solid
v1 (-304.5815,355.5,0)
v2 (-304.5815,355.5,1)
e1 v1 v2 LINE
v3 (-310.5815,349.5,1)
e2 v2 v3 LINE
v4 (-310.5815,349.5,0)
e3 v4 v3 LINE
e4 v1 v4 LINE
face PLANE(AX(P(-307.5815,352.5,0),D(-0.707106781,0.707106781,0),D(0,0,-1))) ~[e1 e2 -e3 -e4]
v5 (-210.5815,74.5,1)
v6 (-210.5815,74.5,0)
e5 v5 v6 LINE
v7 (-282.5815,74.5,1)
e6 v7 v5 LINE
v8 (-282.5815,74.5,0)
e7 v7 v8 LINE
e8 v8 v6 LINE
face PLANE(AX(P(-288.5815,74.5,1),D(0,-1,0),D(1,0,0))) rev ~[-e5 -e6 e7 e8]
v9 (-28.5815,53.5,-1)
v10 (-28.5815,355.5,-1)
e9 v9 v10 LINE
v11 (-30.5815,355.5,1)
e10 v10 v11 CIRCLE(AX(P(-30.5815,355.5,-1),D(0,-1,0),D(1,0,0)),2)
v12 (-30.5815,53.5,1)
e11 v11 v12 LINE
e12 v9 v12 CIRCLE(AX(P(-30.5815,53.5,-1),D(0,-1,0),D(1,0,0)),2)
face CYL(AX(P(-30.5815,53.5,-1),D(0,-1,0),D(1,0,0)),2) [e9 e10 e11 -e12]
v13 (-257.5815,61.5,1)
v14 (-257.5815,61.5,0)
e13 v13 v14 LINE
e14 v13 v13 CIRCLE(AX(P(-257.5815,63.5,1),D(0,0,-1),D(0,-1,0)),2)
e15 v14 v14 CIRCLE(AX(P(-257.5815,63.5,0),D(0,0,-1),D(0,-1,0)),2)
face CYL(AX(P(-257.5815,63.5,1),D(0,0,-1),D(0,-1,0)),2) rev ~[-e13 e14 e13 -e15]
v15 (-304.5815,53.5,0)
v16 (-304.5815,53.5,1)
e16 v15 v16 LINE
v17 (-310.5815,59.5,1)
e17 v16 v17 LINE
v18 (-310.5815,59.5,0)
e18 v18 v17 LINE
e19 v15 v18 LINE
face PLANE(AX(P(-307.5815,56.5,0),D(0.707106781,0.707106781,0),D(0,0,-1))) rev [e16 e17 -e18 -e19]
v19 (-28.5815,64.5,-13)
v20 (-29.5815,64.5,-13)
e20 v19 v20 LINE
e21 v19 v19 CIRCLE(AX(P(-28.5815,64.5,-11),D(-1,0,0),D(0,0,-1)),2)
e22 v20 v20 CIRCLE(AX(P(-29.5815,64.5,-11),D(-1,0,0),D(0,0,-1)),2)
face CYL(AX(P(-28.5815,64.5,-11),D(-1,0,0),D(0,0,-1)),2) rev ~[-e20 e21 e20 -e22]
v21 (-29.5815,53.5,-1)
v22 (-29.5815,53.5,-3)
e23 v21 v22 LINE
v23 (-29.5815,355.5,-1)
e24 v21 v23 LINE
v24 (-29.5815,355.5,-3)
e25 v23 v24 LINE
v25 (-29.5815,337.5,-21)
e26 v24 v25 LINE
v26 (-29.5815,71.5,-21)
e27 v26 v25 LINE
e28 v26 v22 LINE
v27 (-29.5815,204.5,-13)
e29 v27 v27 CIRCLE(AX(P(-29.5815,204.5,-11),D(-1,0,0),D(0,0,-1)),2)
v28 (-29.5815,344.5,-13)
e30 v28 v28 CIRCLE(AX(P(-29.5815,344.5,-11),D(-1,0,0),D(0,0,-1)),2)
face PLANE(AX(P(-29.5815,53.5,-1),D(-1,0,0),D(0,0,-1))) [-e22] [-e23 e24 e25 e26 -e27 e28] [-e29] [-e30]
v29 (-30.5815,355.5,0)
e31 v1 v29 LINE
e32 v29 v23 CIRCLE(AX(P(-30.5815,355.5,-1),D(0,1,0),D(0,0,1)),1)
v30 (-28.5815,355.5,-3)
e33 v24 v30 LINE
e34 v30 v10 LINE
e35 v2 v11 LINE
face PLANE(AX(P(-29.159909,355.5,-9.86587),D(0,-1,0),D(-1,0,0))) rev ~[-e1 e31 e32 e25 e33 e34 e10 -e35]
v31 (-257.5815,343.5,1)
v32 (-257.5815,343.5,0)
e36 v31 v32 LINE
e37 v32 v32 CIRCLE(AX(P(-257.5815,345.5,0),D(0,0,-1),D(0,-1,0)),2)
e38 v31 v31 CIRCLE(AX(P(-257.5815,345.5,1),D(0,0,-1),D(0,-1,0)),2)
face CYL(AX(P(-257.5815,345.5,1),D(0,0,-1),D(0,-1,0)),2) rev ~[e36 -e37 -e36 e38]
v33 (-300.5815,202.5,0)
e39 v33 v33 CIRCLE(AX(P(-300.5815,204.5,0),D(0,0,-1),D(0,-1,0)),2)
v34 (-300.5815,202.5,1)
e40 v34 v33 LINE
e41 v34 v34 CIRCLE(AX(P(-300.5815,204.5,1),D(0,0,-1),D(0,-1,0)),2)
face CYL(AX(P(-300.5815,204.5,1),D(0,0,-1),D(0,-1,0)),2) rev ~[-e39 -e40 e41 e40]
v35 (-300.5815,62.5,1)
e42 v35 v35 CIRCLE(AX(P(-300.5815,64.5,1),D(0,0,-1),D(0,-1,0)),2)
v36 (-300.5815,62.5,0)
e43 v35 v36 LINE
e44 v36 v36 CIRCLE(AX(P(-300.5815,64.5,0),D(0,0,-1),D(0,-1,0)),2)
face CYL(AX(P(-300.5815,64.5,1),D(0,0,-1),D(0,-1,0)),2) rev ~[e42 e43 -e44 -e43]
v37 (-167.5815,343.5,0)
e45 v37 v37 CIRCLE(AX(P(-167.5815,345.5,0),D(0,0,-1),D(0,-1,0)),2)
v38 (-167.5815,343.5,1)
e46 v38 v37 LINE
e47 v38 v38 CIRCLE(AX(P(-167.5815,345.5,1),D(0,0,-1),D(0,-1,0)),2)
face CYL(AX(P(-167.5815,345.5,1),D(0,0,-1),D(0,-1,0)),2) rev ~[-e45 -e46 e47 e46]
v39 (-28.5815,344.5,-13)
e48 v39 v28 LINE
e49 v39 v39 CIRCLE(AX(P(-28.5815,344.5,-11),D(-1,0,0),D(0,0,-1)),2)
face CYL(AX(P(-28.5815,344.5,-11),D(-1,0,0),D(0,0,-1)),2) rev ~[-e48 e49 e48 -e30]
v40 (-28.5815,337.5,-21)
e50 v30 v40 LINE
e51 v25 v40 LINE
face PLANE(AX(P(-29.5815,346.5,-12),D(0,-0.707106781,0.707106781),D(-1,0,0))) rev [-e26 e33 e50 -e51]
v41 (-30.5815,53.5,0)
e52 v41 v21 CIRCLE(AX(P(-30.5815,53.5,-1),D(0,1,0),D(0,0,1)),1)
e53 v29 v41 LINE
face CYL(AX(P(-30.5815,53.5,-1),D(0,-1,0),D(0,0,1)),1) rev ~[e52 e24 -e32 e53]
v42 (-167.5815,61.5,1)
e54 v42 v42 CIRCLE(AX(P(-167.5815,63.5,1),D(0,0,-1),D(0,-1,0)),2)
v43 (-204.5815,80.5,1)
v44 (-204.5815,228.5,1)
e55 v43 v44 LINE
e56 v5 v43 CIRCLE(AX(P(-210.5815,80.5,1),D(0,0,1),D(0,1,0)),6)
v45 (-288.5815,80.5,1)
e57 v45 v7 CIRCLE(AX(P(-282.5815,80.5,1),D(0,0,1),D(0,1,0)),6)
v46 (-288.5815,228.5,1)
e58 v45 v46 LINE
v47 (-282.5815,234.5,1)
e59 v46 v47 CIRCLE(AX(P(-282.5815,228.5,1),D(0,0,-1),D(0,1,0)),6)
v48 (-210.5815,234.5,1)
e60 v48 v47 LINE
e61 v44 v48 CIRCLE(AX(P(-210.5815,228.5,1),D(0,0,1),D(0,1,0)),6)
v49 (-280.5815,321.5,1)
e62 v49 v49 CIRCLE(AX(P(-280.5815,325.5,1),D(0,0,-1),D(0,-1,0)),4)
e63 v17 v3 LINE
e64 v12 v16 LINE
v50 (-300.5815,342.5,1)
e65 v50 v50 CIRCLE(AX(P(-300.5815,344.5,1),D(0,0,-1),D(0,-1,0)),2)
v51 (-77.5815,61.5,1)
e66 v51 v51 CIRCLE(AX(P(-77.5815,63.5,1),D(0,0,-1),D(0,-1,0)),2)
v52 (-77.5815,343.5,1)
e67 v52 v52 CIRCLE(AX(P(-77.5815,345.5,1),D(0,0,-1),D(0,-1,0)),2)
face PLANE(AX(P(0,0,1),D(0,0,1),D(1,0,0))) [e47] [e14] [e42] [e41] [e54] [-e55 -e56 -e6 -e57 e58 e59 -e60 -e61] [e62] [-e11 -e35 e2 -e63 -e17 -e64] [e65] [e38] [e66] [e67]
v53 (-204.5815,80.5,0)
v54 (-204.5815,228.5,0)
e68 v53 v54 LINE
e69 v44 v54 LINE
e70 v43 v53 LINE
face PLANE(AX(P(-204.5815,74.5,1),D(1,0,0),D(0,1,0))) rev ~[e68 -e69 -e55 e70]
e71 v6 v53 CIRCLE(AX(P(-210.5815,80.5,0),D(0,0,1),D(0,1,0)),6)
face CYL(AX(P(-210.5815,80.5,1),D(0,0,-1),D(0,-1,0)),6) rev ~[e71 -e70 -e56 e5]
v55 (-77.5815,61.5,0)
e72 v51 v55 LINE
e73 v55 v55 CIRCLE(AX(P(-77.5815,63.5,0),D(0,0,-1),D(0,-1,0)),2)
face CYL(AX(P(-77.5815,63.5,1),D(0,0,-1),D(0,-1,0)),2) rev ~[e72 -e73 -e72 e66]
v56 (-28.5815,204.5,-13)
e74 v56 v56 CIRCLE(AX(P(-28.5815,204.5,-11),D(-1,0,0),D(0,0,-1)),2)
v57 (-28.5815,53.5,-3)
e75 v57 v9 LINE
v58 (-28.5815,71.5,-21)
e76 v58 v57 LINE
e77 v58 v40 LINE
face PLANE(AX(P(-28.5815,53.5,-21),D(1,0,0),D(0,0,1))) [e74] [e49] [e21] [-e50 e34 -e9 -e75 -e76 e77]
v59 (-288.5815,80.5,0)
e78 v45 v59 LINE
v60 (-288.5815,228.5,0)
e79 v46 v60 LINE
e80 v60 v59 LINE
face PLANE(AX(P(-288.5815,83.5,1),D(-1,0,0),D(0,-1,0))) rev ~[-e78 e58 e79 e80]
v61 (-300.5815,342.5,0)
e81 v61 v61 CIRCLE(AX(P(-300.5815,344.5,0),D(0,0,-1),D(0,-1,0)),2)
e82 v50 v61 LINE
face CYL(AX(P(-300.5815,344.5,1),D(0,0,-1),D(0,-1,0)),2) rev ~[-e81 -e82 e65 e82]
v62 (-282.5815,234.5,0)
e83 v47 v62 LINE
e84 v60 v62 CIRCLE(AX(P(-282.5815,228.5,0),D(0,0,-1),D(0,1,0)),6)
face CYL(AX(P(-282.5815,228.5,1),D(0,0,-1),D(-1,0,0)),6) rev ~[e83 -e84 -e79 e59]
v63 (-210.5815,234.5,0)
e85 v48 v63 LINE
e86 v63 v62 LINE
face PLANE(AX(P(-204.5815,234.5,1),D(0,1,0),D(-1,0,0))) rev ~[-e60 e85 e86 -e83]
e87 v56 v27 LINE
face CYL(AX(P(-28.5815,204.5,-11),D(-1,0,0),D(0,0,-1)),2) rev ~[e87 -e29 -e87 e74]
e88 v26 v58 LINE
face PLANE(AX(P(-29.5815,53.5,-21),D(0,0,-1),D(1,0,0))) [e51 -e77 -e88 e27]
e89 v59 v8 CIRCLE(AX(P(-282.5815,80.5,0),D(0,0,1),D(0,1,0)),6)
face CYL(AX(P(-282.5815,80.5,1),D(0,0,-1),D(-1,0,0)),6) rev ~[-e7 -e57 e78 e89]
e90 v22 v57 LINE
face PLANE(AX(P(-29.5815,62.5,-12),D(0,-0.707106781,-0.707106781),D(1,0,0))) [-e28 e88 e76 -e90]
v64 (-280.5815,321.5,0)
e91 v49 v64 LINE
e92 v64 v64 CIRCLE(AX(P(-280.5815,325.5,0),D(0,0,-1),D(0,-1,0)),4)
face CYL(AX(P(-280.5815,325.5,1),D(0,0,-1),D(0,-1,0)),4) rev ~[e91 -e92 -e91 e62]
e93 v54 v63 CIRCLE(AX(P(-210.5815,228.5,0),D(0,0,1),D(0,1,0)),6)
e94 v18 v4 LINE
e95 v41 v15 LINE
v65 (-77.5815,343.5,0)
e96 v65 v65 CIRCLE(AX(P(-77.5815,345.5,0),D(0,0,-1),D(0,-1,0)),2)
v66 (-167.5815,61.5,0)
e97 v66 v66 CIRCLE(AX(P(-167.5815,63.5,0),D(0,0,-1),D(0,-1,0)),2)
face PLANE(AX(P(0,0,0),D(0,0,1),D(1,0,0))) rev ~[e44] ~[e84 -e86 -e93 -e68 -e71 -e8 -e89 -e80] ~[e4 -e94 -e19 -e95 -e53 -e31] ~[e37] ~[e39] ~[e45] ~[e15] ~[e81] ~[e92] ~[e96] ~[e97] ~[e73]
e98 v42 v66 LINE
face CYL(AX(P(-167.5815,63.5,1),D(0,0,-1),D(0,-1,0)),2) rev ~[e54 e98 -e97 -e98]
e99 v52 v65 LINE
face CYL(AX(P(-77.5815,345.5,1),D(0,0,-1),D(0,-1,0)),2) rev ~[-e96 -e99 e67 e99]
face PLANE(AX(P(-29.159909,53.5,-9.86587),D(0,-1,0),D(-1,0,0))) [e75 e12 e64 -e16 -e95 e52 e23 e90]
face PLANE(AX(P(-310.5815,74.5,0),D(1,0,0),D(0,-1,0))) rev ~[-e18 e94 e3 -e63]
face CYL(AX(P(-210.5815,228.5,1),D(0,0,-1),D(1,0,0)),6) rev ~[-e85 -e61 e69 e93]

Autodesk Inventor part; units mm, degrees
ref_plane "YZ Plane" through (0, 0, 0) normal (1, 0, 0) x (0, 1, 0)
ref_plane "XZ Plane" through (0, 0, 0) normal (0, 1, 0) x (-1, 0, 0)
ref_plane "XY Plane" through (0, 0, 0) normal (0, 0, 1) x (1, 0, 0)
sketch "Sketch1" plane through (0, 0, 0) normal (0, 0, 1) x (1, 0, 0)
  line L0 (-29.5815, 53.7121) -> (-29.5815, 355.2879)
  line L1 (-329.5815, 355.5) -> (-54.5815, 355.5)
  line L2 (-329.5815, 53.5) -> (-54.5815, 53.5)
  line L3 (-310.5815, 334.5) -> (-310.5815, 74.5)
  line L4 (-29.5815, 355.5) -> (-310.5815, 355.5)
  line L5 (-310.5815, 355.5) -> (-310.5815, 53.5)
  line L6 (-310.5815, 53.5) -> (-29.5815, 53.5)
  line L7 (-29.5815, 53.5) -> (-29.5815, 355.5)
  point P0 (0, 0)
extrude "Plate1" add sketch "Sketch1" along normal blind 1
sketch "Sketch2" plane through (-29.5815, 53.5, 0) normal (1, 0, 0) x (0, 1, 0)
  line L0 (302, 0) -> (0, 0)
  line L1 (0, 0) -> (0, -21)
  line L2 (0, -21) -> (302, -21)
  line L3 (302, -21) -> (302, 0)
edge flange "Flange1" height 22 angle 90 thickness 1 bend radius 1 thickness toward (1, 0, 0) relief tear relief width 1 relief depth 0.5 edges at (-29.5815, 204.5, 0) wall of the first edge with corners at (-29.5815, 355.5, 0) (-29.5815, 53.5, 0) (-29.5815, 53.5, -21) (-29.5815, 355.5, -21)
bend "Bend1"
corner "Corner1"
chamfer "Corner Chamfer1" distance 18 angle 45 1 edges at (-29.0815, 355.5, -21)
chamfer "Corner Chamfer2" distance 18 angle 45 1 edges at (-29.0815, 53.5, -21)
chamfer "Corner Chamfer3" distance 6 angle 45 2 edges at (-310.5815, 355.5, 0.5) (-310.5815, 53.5, 0.5)
sketch "Sketch3" plane through (0, 0, 1) normal (0, 0, 1) x (1, 0, 0)
  line L0 (-310.5815, 59.5) -> (-310.5815, 349.5) projected
  line L1 (-304.5815, 355.5) -> (-30.5815, 355.5) projected
  line L2 (-304.5815, 53.5) -> (-30.5815, 53.5) projected
  point P0 (0, 0)
  point P1 (-77.5815, 345.5)
  point P2 (-167.5815, 345.5)
  point P3 (-257.5815, 345.5)
  point P4 (-300.5815, 344.5)
  point P5 (-300.5815, 204.5)
  point P6 (-300.5815, 64.5)
  point P7 (-257.5815, 63.5)
  point P8 (-167.5815, 63.5)
  point P9 (-77.5815, 63.5)
  point P10 (-310.5815, 204.5)
  point P11 (-167.5815, 355.5)
  dimension "d20" = 90
  dimension "d21" = 90
  dimension "d22" = 10
  dimension "d23" = 10
  dimension "d24" = 140
  dimension "d25" = 140
  dimension "d26" = 10
hole "Hole1" at (-77.5815, 345.5, 1) at (-167.5815, 345.5, 1) at (-257.5815, 345.5, 1) at (-300.5815, 344.5, 1) at (-300.5815, 204.5, 1) at (-300.5815, 64.5, 1) at (-257.5815, 63.5, 1) at (-167.5815, 63.5, 1) at (-77.5815, 63.5, 1) direction (0, 0, -1) diameter 4 depth 1 tip angle 118
sketch "Sketch4" plane through (-28.5815, 53.5, -1) normal (1, 0, 0) x (0, 0, -1)
  line L0 (20, 284) -> (20, 18) projected
  point P0 (-1, -53.5)
  point P1 (10, 291)
  point P2 (10, 151)
  point P3 (10, 11)
  point P4 (20, 151)
  dimension "d34" = 10
  dimension "d35" = 140
  dimension "d36" = 140
hole "Hole2" at (-28.5815, 344.5, -11) at (-28.5815, 204.5, -11) at (-28.5815, 64.5, -11) direction (-1, 0, 0) diameter 4 depth 1 tip angle 118
sketch "Sketch5" plane through (0, 0, 1) normal (0, 0, 1) x (1, 0, 0)
  line L0 (-288.5815, 83.5) -> (-288.5815, 325.5) projected
  line L1 (-329.5815, 74.5) -> (-54.5815, 74.5) projected
  line L2 (-204.5815, 234.5) -> (-288.5815, 234.5)
  line L3 (-288.5815, 234.5) -> (-288.5815, 74.5)
  line L4 (-288.5815, 74.5) -> (-204.5815, 74.5)
  line L5 (-204.5815, 74.5) -> (-204.5815, 234.5)
  point P0 (0, 0)
  dimension "d44" = 84
  dimension "d45" = 160
extrude "Cut1" cut sketch "Sketch5" against normal blind 1
fillet "Corner Round1" radius 6 4 edges at (-204.5815, 234.5, 0.5) (-288.5815, 234.5, 0.5) (-204.5815, 74.5, 0.5) (-288.5815, 74.5, 0.5)
sketch "Sketch6" plane through (0, 0, 1) normal (0, 0, 1) x (1, 0, 0)
  line L0 (-304.5815, 355.5) -> (-30.5815, 355.5) projected
  line L1 (-310.5815, 349.5) -> (-310.5815, 59.5) projected
  point P0 (0, 0)
  point P1 (-280.5815, 325.5)
  dimension "d49" = 30
  dimension "d50" = 30
hole "Hole3" at (-280.5815, 325.5, 1) direction (0, 0, -1) diameter 8 depth 1 tip angle 118
equation "\"d21\" = d20"
equation "\"d25\" = d24"
equation "\"d32\" = Thickness"
equation "\"d36\" = d35"
equation "\"d42\" = Thickness"
equation "\"d46\" = Thickness"
equation "\"d56\" = Thickness"
equation "\"d1\" = BendReliefWidth"
equation "\"d2\" = BendReliefDepth"
equation "\"d3\" = MinimumRemnant"
equation "\"d4\" = BendRadius"
equation "\"d7\" = BendRadius"
equation "\"d8\" = CornerReliefSize"
equation "\"d9\" = GapSize"
equation "\"d10\" = JacobiRadiusSize"
equation "\"BendRadius\" = Thickness"
equation "\"BendReliefWidth\" = Thickness"
equation "\"BendReliefDepth\" = 0.5 * Thickness"
equation "\"CornerReliefSize\" = 4 * Thickness"
equation "\"MinimumRemnant\" = 2 * Thickness"
equation "\"TransitionRadius\" = BendRadius"
equation "\"JacobiRadiusSize\" = BendRadius"
equation "\"GapSize\" = Thickness"
equation "\"d0\" = BendRadius"
equation "\"Thickness\" = 1"
properties part number "sheetblack"
